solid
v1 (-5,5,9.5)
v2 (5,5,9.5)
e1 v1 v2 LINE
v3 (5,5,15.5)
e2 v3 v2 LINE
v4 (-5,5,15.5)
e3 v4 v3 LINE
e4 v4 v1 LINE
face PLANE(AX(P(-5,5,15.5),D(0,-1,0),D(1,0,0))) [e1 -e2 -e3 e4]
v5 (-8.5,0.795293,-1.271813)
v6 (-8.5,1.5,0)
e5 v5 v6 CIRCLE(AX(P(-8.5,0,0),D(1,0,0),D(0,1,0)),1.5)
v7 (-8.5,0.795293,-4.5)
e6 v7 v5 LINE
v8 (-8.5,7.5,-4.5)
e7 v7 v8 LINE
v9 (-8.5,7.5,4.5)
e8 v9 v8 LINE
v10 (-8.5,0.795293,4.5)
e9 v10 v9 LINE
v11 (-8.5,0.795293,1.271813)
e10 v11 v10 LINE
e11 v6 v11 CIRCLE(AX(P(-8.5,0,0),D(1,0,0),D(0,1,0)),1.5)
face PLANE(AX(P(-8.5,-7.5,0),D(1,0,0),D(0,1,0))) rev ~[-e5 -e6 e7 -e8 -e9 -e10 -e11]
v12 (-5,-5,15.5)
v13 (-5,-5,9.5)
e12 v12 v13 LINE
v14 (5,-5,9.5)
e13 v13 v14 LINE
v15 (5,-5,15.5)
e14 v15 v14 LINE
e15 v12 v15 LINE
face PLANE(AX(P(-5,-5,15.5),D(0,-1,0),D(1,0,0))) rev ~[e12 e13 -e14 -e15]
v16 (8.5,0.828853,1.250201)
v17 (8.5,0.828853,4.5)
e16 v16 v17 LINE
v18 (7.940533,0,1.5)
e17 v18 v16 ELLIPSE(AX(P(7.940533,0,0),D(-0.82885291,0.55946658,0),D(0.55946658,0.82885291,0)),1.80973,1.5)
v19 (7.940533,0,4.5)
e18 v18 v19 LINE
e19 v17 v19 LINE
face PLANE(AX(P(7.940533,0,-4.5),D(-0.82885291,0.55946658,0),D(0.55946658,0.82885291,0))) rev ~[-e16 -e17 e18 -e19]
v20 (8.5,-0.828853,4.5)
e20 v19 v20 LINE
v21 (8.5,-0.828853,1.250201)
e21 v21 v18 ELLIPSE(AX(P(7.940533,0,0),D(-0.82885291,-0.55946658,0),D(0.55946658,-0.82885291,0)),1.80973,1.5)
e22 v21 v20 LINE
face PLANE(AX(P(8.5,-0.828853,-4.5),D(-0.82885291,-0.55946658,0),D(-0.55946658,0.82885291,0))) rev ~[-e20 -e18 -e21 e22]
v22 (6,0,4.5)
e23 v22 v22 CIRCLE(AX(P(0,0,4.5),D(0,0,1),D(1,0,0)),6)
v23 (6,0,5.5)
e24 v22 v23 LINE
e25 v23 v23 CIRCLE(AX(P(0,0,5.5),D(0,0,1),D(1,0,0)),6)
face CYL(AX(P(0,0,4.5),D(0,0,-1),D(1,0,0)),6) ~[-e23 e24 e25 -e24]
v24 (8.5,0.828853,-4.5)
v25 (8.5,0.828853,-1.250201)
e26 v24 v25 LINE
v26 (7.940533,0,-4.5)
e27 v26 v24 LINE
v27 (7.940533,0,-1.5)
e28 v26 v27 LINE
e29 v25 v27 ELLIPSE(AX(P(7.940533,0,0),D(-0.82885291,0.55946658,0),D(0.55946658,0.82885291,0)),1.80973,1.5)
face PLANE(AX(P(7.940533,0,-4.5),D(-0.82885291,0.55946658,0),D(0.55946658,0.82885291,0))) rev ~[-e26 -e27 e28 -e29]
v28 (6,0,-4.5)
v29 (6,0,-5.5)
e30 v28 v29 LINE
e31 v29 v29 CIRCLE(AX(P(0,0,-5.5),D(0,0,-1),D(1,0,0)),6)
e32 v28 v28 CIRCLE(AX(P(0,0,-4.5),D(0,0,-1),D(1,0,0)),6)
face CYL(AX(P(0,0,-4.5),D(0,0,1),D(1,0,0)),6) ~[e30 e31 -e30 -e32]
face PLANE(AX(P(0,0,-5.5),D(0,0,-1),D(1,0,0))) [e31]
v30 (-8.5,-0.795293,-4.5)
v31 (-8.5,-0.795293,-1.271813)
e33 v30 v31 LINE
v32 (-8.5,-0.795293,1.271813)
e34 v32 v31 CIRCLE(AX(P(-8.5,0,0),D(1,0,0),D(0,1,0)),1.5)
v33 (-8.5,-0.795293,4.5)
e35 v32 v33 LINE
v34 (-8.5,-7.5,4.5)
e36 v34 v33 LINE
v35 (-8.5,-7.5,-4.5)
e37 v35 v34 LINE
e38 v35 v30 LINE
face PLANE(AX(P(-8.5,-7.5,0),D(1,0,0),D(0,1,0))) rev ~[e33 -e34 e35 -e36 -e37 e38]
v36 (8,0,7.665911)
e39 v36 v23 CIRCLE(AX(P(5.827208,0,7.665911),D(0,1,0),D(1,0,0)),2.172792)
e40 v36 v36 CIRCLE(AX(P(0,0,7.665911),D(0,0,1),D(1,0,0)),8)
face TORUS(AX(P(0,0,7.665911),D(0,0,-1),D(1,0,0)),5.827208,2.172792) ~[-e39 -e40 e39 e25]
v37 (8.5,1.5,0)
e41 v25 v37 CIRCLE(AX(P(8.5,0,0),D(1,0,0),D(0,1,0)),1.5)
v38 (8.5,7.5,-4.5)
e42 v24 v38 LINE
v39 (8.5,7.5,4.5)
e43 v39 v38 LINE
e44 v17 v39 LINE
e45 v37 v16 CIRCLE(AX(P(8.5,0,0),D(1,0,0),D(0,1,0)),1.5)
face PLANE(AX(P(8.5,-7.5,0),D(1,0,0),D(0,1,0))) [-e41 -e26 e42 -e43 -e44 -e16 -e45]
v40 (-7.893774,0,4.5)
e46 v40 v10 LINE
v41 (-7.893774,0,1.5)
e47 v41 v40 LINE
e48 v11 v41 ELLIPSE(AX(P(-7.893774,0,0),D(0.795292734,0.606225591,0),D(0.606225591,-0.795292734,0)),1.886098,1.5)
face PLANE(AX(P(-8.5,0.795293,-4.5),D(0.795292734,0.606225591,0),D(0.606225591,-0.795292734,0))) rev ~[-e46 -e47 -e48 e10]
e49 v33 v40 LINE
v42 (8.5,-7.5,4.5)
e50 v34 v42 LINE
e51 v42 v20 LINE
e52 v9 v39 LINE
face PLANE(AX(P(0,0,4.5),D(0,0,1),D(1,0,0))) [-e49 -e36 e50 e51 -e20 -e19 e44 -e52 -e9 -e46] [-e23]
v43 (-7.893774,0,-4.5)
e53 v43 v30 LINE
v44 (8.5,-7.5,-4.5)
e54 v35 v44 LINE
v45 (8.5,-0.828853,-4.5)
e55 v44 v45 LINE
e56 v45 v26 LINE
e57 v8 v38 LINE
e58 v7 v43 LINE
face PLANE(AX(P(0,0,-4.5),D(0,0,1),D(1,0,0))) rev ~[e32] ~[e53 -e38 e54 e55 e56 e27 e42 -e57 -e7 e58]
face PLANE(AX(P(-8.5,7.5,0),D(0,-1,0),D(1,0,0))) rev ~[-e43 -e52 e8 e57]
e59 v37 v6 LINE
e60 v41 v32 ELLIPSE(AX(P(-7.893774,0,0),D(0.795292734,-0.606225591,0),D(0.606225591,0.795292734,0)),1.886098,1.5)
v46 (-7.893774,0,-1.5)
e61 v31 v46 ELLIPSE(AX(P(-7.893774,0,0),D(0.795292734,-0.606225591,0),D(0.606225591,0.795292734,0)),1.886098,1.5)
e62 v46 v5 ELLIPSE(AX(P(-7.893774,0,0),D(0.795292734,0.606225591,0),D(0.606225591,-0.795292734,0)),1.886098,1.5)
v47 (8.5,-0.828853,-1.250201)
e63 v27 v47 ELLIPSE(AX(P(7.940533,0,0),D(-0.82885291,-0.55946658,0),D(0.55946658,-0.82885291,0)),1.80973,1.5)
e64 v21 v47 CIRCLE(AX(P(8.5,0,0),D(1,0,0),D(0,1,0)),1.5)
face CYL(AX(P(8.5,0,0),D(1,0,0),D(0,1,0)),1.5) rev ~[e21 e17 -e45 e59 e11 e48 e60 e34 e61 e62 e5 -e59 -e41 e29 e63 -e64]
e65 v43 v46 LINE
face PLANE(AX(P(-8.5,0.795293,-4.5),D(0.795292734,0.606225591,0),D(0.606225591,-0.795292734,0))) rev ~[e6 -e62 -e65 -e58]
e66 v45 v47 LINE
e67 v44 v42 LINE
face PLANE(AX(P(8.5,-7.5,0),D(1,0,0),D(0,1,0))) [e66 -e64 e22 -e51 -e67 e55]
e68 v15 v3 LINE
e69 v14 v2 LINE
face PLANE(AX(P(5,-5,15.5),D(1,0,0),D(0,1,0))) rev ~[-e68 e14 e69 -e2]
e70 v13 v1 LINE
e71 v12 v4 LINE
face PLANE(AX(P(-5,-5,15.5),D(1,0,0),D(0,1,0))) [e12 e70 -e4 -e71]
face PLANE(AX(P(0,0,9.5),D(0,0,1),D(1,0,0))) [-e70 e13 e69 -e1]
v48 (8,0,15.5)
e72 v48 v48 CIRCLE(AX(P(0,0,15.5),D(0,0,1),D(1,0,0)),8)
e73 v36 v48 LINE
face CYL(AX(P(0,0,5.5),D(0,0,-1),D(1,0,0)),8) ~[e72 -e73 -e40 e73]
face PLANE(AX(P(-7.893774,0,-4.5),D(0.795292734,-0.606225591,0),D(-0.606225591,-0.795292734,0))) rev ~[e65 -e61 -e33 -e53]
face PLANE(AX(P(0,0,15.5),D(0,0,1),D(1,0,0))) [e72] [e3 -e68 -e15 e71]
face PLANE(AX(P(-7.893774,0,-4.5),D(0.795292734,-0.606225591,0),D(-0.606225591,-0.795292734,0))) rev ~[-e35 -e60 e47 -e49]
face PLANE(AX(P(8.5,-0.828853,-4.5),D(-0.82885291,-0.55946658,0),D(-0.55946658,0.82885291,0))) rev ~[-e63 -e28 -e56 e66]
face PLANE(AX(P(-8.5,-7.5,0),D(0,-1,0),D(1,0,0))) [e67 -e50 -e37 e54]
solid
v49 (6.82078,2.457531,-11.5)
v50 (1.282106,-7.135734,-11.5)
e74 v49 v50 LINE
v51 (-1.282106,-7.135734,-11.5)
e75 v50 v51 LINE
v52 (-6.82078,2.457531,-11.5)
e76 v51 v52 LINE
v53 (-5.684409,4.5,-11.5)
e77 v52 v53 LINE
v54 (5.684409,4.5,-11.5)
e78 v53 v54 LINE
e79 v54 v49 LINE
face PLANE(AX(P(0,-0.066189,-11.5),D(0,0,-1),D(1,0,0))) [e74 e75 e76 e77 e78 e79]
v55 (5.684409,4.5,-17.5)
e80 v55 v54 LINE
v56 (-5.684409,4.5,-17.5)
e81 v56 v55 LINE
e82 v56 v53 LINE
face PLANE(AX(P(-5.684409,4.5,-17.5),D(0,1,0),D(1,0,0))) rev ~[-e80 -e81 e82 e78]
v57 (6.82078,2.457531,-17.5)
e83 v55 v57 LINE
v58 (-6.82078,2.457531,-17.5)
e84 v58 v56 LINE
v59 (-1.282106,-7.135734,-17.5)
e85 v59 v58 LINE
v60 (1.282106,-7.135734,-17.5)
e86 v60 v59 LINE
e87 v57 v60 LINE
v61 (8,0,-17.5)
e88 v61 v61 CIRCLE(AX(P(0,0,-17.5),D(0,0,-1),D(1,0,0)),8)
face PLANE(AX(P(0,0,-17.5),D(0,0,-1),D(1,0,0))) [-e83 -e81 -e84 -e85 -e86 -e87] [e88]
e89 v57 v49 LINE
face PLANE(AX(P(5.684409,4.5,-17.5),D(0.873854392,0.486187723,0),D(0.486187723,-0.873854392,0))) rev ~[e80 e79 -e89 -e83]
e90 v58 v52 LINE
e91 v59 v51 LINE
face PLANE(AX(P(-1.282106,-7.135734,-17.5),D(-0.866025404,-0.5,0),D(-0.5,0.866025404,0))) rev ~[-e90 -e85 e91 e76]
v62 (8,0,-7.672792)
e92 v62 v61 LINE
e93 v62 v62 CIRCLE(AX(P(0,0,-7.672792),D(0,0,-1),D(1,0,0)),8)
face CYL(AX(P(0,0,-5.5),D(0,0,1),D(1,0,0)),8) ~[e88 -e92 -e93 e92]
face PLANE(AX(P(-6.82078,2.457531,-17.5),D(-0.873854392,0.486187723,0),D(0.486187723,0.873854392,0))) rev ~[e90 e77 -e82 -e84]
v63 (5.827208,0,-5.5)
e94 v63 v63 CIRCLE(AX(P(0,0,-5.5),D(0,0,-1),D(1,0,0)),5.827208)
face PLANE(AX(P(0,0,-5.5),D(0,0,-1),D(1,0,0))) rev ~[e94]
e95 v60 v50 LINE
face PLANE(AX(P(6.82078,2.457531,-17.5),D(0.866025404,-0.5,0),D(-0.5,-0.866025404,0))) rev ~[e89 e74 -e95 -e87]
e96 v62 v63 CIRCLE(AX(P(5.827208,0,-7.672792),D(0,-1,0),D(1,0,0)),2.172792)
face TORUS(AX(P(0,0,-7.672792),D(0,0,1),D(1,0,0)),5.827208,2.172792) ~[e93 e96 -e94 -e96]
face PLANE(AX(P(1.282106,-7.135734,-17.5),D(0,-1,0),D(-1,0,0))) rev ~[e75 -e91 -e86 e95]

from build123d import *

# Parameters (mm, degrees)
F0_W      = 17
F0_H      = 15
F1_DEPTH  = 4.5
F2_R      = 6
F3_DEPTH  = 1
F4_R      = 6
F5_DEPTH  = 1
F6_R      = 1.5
F7_DEPTH  = 17.001
F9_DEPTH  = 10.001
F10_R     = 8
F11_DEPTH = 10
F12_R     = 8
F12_R_2   = 6
F13_DEPTH = 12
F16_DEPTH = 6
F17_W     = 10
F17_H     = 10
F18_DEPTH = 6


# Not quite as in the source:
# - a fillet or chamfer that OpenCascade refuses, or shapes differently, is made with other operations: its cross-section is extruded or revolved along the edge and cut away or added


with BuildPart() as f1:
    # F0 (on Top) → F1 (new body, symmetric)
    with BuildSketch(Plane.XY):
        Rectangle(F0_W, F0_H)
    extrude(amount=F1_DEPTH, both=True)

    # F2 (on face) → F3 (join)
    with BuildSketch(Plane.XY.offset(4.5)):
        Circle(F2_R)
    extrude(amount=F3_DEPTH)

    # F4 (on face) → F5 (join)
    with BuildSketch(Plane(origin=(0, 0, -4.5), x_dir=(1, 0, 0), z_dir=(0, 0, -1))):
        Circle(F4_R)
    extrude(amount=F5_DEPTH)

    # F6 (on face) → F7 (cut, through all)
    with BuildSketch(Plane.YZ.offset(8.5)):
        Circle(F6_R)
    extrude(amount=-F7_DEPTH, mode=Mode.SUBTRACT)

    # F8 (on face) → F9 (cut, through all)
    with BuildSketch(Plane(origin=(0, 0, -4.5), x_dir=(1, 0, 0), z_dir=(0, 0, -1))):
        Polygon((8.5, 0.8288529099), (7.9405334204, 0), (8.5, -0.8288529099), align=None)
        Polygon((-8.5, -0.7952927344), (-7.8937744095, 0), (-8.5, 0.7952927344), align=None)
    extrude(amount=-F9_DEPTH, mode=Mode.SUBTRACT)

    # F10 (on face) → F11 (join)
    with BuildSketch(Plane.XY.offset(5.5)):
        Circle(F10_R)
    extrude(amount=F11_DEPTH)

    # F14: fillet of radius 2.1727922061 on 1 edges, made by hand

    # F14_s1 → F14_t2 (revolve, cut)
    with BuildSketch(Plane.XZ):
        with BuildLine():
            ThreePointArc((8, 7.6659106225), (7.4235266107, 6.1918712044), (6, 5.5))
            Line((6, 5.5), (8, 5.5))
            Line((8, 5.5), (8, 7.6659106225))
        make_face()
    revolve(axis=Axis((0, 0, 5.5), (0, 0, 1)), mode=Mode.SUBTRACT)

    # F17 (on face) → F18 (cut)
    with BuildSketch(Plane.XY.offset(15.5)):
        Rectangle(F17_W, F17_H)
    extrude(amount=-F18_DEPTH, mode=Mode.SUBTRACT)


with BuildPart() as f13:
    # F12 (on face) → F13 (new body)
    with BuildSketch(Plane(origin=(0, 0, -5.5), x_dir=(1, 0, 0), z_dir=(0, 0, -1))):
        Circle(F12_R)
        Circle(F12_R_2, mode=Mode.SUBTRACT)
        Circle(F12_R_2)
    extrude(amount=F13_DEPTH)

    # F14#2: fillet of radius 2.1727922061 on 1 edges, made by hand

    # F14_2_s1 → F14_2_t2 (revolve, cut)
    with BuildSketch(Plane.XZ):
        with BuildLine():
            ThreePointArc((8, -7.6727922061), (7.3636038969, -6.1363961031), (5.8272077939, -5.5))
            Line((5.8272077939, -5.5), (8, -5.5))
            Line((8, -5.5), (8, -7.6727922061))
        make_face()
    revolve(axis=Axis((0, 0, -5.5), (0, 0, -1)), mode=Mode.SUBTRACT)

    # F15 (on face) → F16 (cut)
    with BuildSketch(Plane(origin=(0, 0, -17.5), x_dir=(1, 0, 0), z_dir=(0, 0, -1))):
        Polygon((1.2821056222, 7.1357343822), (-1.2821056222, 7.1357343822), (-6.8207800608, -2.4575311519), (-5.6844085005, -4.5), (5.6844085005, -4.5), (6.8207800608, -2.4575311519), align=None)
    extrude(amount=-F16_DEPTH, mode=Mode.SUBTRACT)


solid = Compound([f1.part, f13.part])
